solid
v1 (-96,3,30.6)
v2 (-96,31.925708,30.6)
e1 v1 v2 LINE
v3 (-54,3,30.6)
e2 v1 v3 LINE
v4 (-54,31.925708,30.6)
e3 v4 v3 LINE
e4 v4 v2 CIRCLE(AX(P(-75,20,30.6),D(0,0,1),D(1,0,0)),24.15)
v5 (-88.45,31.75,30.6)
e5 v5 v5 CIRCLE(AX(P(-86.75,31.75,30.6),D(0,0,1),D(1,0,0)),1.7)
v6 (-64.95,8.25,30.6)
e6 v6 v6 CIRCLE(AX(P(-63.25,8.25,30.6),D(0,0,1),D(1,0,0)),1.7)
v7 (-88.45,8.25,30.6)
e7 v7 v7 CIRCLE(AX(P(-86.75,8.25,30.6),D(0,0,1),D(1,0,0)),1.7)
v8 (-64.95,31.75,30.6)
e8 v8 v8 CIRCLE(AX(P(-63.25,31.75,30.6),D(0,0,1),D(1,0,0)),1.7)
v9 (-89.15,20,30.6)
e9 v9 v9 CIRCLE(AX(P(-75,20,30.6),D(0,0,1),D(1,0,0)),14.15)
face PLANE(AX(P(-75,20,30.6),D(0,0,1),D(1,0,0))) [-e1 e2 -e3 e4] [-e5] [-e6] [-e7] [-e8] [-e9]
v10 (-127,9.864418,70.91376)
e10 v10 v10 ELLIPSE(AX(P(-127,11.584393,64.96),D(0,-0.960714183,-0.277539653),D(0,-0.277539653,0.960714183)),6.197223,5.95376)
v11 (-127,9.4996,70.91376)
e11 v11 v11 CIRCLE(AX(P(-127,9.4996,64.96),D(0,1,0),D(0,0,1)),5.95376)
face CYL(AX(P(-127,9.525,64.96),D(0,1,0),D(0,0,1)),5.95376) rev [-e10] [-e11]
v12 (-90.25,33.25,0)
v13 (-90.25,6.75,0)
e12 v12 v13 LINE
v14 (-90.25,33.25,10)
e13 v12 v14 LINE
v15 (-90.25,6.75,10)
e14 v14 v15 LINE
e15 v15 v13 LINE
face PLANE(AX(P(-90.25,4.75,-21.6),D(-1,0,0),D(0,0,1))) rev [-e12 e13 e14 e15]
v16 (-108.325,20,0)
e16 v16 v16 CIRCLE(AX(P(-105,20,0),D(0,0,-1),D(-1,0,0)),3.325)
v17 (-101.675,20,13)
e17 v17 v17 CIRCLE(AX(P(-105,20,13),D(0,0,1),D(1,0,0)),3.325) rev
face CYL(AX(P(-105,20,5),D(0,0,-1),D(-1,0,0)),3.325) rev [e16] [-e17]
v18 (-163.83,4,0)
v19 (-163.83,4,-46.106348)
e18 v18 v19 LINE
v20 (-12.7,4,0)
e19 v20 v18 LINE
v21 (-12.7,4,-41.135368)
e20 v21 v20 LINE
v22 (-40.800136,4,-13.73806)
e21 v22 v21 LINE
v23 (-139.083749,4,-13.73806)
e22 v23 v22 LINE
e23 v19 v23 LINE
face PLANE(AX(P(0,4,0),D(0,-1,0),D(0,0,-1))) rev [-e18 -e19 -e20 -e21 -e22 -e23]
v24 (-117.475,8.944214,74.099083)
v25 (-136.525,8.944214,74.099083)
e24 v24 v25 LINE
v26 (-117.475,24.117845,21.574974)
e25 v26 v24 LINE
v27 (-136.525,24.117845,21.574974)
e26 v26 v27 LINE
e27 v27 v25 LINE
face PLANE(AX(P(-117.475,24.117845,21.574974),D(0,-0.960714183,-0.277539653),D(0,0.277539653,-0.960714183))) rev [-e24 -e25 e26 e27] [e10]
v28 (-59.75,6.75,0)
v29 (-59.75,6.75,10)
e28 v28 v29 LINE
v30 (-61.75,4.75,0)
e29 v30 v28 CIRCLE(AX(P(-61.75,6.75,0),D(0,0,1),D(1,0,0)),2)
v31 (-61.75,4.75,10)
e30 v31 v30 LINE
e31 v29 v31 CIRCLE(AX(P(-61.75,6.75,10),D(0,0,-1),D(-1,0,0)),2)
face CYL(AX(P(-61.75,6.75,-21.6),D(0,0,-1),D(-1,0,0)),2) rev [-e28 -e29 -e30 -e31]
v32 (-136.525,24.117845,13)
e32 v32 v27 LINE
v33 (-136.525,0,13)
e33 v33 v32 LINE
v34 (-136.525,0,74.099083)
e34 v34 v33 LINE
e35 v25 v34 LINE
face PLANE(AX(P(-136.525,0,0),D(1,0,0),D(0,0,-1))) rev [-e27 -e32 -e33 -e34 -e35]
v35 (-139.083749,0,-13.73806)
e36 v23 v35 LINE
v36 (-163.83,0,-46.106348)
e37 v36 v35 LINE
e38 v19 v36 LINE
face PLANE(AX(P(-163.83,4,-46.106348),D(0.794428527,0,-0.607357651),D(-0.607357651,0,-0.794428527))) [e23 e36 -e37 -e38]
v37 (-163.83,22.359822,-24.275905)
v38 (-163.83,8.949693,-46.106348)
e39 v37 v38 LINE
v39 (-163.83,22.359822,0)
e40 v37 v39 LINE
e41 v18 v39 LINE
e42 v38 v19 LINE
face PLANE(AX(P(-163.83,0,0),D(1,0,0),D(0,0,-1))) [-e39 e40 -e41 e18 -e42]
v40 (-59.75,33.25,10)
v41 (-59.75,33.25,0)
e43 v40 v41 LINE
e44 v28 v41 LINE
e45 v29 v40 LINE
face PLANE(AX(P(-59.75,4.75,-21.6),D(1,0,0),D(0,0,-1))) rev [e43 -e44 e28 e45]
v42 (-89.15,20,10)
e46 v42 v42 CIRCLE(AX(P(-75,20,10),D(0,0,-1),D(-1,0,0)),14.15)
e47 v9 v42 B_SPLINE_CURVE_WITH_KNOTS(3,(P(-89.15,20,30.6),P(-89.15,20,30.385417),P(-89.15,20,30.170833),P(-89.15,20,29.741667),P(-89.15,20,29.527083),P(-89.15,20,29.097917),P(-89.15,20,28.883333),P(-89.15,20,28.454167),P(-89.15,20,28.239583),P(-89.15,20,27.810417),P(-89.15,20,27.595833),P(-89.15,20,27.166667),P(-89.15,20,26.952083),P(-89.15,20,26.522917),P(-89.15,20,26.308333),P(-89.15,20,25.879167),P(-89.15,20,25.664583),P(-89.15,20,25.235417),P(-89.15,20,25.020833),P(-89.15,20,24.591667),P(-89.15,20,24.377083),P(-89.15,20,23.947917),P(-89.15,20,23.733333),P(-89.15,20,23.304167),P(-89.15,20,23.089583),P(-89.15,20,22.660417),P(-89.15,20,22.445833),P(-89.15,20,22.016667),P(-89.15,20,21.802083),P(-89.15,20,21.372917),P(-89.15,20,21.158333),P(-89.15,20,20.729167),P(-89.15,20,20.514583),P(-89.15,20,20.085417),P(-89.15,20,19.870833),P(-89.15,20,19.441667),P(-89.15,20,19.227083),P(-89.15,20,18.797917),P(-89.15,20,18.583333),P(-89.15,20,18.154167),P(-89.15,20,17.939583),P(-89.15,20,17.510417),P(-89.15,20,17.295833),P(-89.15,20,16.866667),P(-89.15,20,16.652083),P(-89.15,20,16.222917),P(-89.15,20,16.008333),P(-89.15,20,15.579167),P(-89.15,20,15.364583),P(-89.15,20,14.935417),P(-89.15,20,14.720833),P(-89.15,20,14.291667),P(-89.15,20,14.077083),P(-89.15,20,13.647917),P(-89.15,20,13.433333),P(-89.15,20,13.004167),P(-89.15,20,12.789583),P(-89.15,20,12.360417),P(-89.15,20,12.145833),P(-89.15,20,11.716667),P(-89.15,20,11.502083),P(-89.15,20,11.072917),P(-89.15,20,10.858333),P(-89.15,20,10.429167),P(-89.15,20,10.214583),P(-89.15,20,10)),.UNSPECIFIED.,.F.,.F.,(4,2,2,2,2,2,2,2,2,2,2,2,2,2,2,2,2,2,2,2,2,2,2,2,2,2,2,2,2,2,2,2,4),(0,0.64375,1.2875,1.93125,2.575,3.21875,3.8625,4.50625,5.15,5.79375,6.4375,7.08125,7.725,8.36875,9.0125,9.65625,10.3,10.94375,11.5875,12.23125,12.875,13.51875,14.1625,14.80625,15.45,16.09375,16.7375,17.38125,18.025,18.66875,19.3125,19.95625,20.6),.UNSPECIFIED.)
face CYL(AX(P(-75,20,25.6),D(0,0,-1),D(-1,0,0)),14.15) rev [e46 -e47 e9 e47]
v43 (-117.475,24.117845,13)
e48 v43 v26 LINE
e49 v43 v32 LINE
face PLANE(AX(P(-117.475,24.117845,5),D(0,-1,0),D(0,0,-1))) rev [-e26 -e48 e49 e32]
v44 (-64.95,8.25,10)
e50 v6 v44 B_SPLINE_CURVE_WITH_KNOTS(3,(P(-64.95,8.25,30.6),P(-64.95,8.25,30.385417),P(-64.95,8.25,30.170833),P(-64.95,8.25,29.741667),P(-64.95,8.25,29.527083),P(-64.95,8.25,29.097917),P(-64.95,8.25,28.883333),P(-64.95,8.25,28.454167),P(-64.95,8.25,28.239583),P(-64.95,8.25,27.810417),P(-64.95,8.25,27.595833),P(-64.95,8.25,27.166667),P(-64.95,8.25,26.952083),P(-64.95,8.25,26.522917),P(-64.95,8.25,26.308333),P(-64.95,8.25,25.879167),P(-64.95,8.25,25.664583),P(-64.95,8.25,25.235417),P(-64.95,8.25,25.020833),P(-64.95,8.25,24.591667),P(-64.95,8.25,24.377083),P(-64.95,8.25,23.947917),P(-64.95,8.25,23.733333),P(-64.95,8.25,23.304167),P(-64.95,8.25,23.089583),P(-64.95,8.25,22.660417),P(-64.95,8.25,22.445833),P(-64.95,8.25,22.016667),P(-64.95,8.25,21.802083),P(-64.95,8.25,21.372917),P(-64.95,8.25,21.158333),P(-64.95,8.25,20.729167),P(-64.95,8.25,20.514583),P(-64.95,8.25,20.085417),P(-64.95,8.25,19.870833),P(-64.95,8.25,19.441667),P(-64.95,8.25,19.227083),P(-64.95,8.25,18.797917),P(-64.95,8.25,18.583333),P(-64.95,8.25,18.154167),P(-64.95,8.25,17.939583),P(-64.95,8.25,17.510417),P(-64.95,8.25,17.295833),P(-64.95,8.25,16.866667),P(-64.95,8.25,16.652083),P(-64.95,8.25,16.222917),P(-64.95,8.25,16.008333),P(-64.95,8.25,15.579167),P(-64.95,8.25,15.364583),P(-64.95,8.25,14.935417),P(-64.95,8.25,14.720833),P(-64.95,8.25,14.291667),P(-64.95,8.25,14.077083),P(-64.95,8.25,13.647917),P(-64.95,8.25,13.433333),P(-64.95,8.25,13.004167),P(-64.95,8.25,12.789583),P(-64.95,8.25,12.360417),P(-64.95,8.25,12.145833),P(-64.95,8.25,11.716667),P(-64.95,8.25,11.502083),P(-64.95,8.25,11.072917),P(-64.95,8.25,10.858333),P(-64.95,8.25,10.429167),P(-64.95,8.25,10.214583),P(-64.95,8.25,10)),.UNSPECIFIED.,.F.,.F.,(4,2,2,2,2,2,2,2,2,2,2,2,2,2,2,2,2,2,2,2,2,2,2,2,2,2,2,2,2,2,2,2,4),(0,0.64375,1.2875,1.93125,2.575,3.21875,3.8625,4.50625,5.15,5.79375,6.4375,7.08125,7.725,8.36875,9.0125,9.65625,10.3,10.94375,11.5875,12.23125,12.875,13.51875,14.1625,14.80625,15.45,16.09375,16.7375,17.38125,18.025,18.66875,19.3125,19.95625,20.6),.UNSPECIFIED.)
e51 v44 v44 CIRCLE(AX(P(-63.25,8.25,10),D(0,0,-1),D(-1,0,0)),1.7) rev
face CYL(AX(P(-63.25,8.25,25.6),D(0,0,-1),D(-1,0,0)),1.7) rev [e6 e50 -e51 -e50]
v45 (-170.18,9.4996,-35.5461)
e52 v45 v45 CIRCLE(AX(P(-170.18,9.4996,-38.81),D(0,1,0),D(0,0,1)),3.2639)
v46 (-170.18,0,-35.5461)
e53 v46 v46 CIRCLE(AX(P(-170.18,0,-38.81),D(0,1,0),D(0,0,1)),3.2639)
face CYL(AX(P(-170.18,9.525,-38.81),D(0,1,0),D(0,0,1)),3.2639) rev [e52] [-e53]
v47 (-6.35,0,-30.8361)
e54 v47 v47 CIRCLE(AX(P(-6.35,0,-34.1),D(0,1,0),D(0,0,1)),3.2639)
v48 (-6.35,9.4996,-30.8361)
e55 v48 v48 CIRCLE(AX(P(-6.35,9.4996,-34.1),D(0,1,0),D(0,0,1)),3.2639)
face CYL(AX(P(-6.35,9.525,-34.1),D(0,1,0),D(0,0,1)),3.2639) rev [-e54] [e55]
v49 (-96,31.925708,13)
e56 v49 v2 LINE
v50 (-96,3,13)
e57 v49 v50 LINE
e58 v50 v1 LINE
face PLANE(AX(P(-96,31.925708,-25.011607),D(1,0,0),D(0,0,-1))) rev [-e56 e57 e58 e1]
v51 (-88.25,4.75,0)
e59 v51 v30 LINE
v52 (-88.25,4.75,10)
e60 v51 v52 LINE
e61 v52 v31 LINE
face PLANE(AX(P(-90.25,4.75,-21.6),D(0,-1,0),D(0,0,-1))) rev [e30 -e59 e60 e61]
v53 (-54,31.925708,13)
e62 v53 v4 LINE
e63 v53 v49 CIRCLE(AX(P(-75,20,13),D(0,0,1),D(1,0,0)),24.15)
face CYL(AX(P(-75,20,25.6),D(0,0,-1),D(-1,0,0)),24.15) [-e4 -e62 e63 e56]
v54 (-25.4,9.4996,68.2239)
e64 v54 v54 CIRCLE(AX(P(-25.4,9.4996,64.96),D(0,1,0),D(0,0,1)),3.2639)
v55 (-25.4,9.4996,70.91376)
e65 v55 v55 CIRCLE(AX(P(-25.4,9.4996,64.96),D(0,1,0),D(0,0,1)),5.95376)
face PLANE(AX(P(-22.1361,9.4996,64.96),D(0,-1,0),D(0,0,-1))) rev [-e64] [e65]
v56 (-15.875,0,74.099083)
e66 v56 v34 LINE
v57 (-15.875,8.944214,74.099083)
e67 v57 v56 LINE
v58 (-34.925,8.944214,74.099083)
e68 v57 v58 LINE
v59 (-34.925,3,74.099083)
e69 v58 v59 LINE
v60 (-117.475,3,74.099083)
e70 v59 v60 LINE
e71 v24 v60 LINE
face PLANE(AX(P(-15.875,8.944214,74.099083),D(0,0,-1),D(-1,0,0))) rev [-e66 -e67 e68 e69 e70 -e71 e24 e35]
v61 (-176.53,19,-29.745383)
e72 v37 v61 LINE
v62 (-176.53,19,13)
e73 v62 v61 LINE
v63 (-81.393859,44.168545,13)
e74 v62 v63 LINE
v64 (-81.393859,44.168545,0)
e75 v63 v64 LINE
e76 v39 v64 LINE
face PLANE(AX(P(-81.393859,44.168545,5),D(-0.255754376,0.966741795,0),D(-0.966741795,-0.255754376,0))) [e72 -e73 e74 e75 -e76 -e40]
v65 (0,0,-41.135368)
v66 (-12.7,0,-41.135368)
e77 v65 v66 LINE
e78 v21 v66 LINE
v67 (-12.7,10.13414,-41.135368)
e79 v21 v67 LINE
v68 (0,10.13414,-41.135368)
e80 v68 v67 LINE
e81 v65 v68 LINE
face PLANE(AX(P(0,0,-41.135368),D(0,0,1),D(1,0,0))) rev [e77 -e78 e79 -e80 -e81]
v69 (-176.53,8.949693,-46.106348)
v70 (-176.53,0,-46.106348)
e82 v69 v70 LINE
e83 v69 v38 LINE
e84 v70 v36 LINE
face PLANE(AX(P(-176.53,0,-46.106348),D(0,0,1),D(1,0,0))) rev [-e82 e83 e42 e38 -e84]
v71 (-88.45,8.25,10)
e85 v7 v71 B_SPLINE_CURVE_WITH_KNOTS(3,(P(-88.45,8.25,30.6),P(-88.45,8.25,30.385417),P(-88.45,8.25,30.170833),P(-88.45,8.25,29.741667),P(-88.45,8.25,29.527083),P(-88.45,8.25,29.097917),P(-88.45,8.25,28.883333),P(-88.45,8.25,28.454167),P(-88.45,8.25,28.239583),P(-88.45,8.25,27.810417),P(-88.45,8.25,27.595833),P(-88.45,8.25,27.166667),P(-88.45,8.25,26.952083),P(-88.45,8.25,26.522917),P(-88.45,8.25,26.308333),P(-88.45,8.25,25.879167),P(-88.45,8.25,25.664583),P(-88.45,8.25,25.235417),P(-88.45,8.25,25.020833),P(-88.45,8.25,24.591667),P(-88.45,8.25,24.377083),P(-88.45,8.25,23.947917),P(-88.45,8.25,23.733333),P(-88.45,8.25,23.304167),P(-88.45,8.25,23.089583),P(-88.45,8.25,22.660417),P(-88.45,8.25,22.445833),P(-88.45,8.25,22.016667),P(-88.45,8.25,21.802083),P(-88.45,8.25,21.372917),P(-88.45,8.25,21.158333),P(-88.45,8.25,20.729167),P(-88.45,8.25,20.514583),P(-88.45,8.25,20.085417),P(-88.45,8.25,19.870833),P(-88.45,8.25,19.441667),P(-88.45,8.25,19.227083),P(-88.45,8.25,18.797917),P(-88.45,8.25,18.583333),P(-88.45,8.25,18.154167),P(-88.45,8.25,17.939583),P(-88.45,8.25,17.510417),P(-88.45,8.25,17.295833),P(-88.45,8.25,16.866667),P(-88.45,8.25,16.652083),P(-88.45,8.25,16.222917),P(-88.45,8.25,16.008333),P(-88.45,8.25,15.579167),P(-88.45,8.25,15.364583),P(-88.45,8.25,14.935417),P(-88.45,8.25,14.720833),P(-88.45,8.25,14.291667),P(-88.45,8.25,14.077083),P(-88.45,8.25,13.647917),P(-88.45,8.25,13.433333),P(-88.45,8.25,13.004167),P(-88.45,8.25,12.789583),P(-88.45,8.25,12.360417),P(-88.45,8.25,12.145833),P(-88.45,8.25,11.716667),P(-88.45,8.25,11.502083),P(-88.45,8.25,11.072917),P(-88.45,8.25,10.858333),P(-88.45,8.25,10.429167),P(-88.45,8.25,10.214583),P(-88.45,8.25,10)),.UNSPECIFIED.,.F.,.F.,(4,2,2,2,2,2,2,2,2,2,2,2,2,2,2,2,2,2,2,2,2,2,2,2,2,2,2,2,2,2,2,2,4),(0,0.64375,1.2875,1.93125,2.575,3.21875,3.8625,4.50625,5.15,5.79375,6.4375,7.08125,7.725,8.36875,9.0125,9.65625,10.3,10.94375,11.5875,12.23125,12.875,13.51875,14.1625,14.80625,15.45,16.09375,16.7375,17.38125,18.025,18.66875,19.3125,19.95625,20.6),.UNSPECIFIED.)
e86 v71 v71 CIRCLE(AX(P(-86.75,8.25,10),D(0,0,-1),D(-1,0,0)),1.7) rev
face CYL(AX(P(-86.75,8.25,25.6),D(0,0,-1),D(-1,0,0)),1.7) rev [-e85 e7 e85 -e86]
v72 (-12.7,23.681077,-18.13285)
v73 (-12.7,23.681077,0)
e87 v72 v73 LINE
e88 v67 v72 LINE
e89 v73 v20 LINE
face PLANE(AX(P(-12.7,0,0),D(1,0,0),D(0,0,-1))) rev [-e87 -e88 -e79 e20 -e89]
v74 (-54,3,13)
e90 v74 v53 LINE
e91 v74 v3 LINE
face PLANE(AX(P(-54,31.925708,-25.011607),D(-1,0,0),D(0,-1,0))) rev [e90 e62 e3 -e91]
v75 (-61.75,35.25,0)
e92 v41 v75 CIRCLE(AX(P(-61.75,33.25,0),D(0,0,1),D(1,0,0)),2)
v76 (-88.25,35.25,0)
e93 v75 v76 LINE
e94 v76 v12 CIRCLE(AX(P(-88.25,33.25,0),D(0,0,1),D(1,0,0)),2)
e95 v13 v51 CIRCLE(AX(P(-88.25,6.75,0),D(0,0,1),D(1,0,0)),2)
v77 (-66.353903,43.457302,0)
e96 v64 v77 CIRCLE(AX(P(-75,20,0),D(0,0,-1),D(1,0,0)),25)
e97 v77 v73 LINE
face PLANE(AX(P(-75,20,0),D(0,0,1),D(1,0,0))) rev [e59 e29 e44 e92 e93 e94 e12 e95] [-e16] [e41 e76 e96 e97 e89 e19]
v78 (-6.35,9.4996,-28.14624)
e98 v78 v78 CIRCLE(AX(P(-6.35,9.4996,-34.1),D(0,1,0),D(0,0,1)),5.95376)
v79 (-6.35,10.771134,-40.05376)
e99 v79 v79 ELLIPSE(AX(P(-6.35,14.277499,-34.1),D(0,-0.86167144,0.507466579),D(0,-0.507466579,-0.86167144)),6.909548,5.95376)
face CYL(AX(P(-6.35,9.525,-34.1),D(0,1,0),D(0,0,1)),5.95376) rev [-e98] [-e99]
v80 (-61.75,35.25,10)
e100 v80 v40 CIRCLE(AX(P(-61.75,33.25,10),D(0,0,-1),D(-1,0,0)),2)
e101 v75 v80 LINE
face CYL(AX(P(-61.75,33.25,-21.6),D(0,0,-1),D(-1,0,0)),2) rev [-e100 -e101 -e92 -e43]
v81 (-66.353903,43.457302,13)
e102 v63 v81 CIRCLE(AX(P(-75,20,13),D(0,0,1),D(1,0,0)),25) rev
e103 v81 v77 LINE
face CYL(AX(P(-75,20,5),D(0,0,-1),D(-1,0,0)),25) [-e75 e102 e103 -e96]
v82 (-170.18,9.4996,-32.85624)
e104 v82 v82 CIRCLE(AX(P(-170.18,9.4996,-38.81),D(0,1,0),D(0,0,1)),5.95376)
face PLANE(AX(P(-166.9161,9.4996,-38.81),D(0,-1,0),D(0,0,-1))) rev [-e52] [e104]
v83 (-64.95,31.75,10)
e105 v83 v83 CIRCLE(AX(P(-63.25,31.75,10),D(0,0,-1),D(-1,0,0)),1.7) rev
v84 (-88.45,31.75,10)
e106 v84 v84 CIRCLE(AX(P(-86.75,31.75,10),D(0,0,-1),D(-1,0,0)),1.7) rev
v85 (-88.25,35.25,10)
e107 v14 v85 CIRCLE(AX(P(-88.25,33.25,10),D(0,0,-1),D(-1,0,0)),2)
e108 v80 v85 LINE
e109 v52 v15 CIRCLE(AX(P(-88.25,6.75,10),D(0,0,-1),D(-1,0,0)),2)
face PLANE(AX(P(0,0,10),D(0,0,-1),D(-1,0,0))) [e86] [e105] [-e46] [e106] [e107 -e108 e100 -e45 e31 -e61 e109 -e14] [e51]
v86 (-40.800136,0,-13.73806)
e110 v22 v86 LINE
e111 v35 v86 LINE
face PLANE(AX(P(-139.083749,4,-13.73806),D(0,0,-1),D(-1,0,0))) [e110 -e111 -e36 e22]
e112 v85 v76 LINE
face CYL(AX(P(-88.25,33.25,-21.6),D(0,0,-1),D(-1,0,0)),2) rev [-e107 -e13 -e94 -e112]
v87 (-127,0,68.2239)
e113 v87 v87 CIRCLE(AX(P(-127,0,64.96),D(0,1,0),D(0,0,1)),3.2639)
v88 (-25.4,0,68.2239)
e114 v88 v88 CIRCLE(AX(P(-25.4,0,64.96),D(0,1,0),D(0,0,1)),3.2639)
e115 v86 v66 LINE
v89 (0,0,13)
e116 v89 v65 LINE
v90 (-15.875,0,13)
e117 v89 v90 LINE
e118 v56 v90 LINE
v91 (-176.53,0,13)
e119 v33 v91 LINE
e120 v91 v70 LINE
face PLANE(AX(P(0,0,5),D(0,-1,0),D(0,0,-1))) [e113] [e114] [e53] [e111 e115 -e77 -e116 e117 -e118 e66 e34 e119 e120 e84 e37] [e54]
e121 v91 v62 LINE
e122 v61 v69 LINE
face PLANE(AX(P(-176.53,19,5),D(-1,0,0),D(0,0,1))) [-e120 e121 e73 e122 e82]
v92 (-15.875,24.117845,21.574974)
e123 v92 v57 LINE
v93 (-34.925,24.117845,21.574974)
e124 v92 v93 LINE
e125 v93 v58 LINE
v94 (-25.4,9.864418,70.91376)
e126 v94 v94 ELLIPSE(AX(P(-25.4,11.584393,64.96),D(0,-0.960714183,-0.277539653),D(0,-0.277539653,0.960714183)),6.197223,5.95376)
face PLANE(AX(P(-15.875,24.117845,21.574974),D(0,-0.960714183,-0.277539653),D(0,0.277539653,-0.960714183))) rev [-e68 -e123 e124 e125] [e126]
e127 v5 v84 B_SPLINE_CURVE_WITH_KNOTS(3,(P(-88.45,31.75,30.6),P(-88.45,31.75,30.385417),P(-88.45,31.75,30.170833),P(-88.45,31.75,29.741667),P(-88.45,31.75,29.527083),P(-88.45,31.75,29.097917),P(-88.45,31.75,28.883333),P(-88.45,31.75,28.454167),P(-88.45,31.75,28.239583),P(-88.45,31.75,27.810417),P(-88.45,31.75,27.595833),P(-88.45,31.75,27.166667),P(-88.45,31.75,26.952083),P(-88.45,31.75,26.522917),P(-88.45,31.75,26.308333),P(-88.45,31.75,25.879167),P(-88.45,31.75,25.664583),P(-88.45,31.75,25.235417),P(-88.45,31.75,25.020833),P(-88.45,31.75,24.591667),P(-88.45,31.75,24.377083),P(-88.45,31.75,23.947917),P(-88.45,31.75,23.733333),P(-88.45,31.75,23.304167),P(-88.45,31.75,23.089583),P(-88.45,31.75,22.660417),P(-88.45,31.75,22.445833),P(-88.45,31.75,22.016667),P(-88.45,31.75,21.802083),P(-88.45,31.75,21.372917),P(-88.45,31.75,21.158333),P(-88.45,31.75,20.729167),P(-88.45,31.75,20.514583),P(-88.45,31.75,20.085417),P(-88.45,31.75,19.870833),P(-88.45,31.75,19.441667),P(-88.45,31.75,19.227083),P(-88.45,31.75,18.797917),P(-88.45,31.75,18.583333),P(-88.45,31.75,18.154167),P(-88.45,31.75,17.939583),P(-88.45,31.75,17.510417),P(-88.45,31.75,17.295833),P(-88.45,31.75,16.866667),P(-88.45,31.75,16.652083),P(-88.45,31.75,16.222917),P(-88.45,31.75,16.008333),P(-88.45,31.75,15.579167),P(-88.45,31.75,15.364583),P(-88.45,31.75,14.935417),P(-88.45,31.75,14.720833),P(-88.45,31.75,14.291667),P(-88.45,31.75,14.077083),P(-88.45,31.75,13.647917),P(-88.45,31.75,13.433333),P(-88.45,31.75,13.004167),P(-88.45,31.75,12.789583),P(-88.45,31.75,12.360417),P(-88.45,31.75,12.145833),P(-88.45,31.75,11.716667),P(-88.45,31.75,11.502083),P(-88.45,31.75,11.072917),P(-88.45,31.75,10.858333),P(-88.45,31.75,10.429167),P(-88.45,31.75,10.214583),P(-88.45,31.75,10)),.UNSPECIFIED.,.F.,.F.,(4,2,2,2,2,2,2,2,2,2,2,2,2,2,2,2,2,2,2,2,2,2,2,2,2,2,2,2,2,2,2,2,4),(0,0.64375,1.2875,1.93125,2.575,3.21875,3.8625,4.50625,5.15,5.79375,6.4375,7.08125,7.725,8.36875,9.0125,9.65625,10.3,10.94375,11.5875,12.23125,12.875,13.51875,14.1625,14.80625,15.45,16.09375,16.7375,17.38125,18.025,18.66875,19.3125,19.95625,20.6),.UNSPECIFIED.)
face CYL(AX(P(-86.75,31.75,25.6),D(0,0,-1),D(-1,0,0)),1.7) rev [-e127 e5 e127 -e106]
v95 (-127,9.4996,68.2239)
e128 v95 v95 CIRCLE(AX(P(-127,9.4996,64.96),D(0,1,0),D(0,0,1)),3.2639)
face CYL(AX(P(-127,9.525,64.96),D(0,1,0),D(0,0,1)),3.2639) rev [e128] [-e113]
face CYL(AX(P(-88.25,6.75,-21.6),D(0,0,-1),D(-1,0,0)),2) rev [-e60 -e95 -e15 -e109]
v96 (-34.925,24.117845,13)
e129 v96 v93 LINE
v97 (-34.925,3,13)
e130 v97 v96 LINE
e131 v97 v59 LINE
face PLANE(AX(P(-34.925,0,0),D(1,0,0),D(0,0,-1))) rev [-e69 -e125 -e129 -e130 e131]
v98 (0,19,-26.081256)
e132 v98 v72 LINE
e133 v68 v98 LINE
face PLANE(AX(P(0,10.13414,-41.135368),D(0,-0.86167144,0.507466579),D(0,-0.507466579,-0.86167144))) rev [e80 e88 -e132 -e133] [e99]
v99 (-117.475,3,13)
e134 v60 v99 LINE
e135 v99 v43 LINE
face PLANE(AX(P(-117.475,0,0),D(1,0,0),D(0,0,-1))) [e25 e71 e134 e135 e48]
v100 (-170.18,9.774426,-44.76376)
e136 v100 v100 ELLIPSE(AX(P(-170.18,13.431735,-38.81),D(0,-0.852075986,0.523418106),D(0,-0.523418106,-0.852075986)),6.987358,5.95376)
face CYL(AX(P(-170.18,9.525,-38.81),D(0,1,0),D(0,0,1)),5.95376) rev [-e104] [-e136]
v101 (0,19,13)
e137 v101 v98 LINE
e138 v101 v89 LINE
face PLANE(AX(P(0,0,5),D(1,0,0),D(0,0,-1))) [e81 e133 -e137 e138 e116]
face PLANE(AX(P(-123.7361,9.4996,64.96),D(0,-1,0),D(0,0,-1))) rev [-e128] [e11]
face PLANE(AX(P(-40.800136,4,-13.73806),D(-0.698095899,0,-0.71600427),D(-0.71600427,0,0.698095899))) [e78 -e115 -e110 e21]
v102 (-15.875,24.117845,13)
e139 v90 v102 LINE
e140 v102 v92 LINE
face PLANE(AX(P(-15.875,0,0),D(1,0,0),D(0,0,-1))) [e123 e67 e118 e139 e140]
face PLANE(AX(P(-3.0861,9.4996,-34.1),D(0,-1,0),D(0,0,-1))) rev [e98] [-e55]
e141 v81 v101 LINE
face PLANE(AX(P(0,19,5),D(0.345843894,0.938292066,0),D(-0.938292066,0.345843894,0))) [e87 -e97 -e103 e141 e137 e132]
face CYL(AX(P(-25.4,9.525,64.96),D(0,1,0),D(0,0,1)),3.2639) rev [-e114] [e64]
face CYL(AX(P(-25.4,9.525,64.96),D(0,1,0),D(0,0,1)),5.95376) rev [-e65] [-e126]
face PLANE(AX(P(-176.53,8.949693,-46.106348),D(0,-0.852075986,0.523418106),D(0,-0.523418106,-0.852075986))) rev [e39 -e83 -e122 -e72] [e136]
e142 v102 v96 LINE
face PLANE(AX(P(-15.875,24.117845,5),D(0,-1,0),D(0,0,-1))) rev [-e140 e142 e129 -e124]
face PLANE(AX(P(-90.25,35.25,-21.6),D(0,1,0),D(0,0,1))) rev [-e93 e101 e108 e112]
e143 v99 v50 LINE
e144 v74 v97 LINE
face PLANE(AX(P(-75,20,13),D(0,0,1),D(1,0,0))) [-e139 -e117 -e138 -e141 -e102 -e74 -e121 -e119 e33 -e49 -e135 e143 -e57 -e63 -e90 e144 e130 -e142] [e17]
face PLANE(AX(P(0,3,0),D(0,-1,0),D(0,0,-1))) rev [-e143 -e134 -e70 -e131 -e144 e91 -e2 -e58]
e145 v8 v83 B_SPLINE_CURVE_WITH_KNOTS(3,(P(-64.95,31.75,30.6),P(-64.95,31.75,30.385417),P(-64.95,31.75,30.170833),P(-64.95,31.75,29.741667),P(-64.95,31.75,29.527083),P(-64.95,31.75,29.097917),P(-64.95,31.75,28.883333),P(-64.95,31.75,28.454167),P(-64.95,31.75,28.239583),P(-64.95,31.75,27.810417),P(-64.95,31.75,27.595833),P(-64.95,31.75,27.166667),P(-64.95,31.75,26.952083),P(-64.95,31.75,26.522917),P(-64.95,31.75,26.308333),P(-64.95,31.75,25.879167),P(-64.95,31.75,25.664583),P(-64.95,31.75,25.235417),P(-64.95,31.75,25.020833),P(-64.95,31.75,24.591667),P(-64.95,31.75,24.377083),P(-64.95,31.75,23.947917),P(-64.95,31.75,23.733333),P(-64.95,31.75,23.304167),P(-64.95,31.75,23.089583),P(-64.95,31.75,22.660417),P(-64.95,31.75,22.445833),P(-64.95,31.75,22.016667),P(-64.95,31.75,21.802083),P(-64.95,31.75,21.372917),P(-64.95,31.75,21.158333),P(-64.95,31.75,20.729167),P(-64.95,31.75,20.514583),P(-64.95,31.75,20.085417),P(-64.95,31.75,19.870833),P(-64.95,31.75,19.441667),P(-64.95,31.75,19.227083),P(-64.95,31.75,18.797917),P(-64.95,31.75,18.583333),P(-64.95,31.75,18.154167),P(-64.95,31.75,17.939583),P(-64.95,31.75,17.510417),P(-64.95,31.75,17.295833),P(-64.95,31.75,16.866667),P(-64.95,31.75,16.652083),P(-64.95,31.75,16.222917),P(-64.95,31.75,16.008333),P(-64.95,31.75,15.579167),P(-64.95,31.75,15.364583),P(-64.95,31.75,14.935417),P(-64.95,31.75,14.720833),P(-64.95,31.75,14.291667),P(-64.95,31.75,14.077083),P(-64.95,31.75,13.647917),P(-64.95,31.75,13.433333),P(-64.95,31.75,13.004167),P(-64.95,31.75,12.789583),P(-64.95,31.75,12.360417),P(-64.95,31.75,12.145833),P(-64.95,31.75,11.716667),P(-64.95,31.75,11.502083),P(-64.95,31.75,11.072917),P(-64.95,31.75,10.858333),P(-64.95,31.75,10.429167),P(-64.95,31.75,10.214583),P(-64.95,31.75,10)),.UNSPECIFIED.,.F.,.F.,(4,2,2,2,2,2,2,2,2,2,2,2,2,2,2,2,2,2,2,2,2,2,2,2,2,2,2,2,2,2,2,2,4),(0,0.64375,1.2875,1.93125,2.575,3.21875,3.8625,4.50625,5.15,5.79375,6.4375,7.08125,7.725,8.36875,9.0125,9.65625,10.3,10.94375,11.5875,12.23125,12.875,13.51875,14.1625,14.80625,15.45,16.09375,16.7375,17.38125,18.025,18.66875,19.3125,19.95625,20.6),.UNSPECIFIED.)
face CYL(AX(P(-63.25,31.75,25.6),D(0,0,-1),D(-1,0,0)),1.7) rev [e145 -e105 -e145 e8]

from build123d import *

# Parameters (mm, degrees)
SKETCH2_W                                     = 176.53
SKETCH2_H                                     = 28.1
BOSS_EXTRUDE1_DEPTH                           = 5
SKETCH3_R                                     = 6.635934172
SKETCH3_R_2                                   = 3.325
BOSS_EXTRUDE2_DEPTH                           = 5
SKETCH4_R                                     = 6.635934172
SKETCH4_R_2                                   = 3.325
BOSS_EXTRUDE3_DEPTH                           = 5
SKETCH5_R                                     = 3.175
SKETCH5_R_2                                   = 3.890528803
BOSS_EXTRUDE4_DEPTH                           = 5
SKETCH9_R                                     = 24.15
SKETCH9_R_2                                   = 14.15
SKETCH9_R_3                                   = 1.7
BOSS_EXTRUDE5_DEPTH                           = 20.6
SKETCH7_W                                     = 30.5
SKETCH7_H                                     = 30.5
CUT_EXTRUDE2_DEPTH                            = 26.6
BOSS_EXTRUDE6_DEPTH                           = 12.7
BOSS_EXTRUDE7_DEPTH                           = 9.525
BOSS_EXTRUDE8_DEPTH                           = 9.525
SKETCH16_W                                    = 82.55
SKETCH16_H                                    = 69.099082758
BOSS_EXTRUDE9_DEPTH                           = 3
DELETEFACE1_START                             = 5
DELETEFACE1_DEPTH                             = 20.6
BOSS_EXTRUDE10_DEPTH                          = 6.35
BOSS_EXTRUDE11_DEPTH                          = 6.35
CBORE_FOR_1_4_BUTTON_HEAD_CAP_SCREW1_AT_COUNT = 2
CBORE_FOR_1_4_BUTTON_HEAD_CAP_SCREW1_AT_PITCH = 100.875101487
CBORE_FOR_1_4_BUTTON_HEAD_CAP_SCREW1_2_COUNT  = 2
CBORE_FOR_1_4_BUTTON_HEAD_CAP_SCREW1_2_PITCH  = 156.106713821
CBORE_FOR_1_4_BUTTON_HEAD_CAP_SCREW1_3_COUNT  = 2
CBORE_FOR_1_4_BUTTON_HEAD_CAP_SCREW1_3_PITCH  = 163.897690649
SKETCH21_R                                    = 5.95376
CUT_EXTRUDE3_DEPTH                            = 195.710016667
SKETCH23_W                                    = 8
SKETCH23_H                                    = 28.925707526
CUT_EXTRUDE4_DEPTH                            = 20.6
DELETEFACE5_START                             = 5
DELETEFACE5_DEPTH                             = 20.6
BOSS_EXTRUDE12_DEPTH                          = 4
MOVE_FACE3_BY                                 = 5
MOVE_FACE4_BY                                 = 5
FILLET1_R                                     = 2
MOVE_FACE5_BY                                 = 8


# Read off the part's stored shape, not the designer's step: DeleteFace1, DeleteFace5, Split1, Split2
with BuildPart() as part:
    # Sketch2 → Boss-Extrude1 (new body)
    with BuildSketch(Plane(origin=(0, 0, 0), x_dir=(1, 0, 0), z_dir=(0, 1, 0))):
        with Locations((-88.265, 14.05)):
            Rectangle(SKETCH2_W, SKETCH2_H)
    extrude(amount=BOSS_EXTRUDE1_DEPTH)

    # Sketch5 → Boss-Extrude4 (add)
    # profile 1 of 2: a face of its own
    with BuildSketch(Plane(origin=(0, 5, 0), x_dir=(1, 0, 0), z_dir=(0, 1, 0))):
        with BuildLine():
            Line((0, 28.1), (0, 34.1))
            ThreePointArc((0, 34.1), (-2.58351874, 39.212349648), (-8.231848479, 40.164746186))
            Line((-8.231848479, 40.164746186), (-47.113631063, 28.1))
            Line((-47.113631063, 28.1), (0, 28.1))
        make_face()
        with Locations(Location((-6.35, 34.1, 0), (0, 0, 270))):
            Circle(SKETCH5_R, mode=Mode.SUBTRACT)
    # profile 2 of 2: a face of its own
    with BuildSketch(Plane(origin=(0, 5, 0), x_dir=(1, 0, 0), z_dir=(0, 1, 0))):
        with BuildLine():
            Line((0, 0), (0, -42.25))
            ThreePointArc((0, -42.25), (-4.382179377, -48.287398612), (-11.480372282, -45.991895275))
            Line((-11.480372282, -45.991895275), (-45.025083296, 0))
            Line((-45.025083296, 0), (0, 0))
        make_face()
        with Locations(Location((-6.35, -42.25, 0), (0, 0, 270))):
            Circle(SKETCH5_R_2, mode=Mode.SUBTRACT)
    extrude(amount=-BOSS_EXTRUDE4_DEPTH)


with BuildPart() as body_2:
    # Sketch3 → Boss-Extrude2 (new body)
    with BuildSketch(Plane(origin=(0, 0, 0), x_dir=(-1, 0, 0), z_dir=(0, 0, -1))):
        with BuildLine():
            Line((0, 0), (176.53, 0))
            Line((176.53, 0), (176.53, 19))
            Line((176.53, 19), (81.3938594, 44.168544887))
            ThreePointArc((81.3938594, 44.168544887), (73.819063639, 44.972092209), (66.353902645, 43.457301646))
            Line((66.353902645, 43.457301646), (0, 19))
            Line((0, 19), (0, 0))
        make_face()
        with Locations((75, 20)):
            Circle(SKETCH3_R, mode=Mode.SUBTRACT)
        with Locations((105, 20)):
            Circle(SKETCH3_R_2, mode=Mode.SUBTRACT)
    extrude(amount=-BOSS_EXTRUDE2_DEPTH)

    # Sketch9 → Boss-Extrude5 (add)
    with BuildSketch(Plane.XY.offset(5)):
        with Locations(Location((-75, 20, 0), (0, 0, 235.909915964))):
            Circle(SKETCH9_R)
        with Locations(Location((-75, 20, 0), (0, 0, 180))):
            Circle(SKETCH9_R_2, mode=Mode.SUBTRACT)
        with Locations(Location((-86.75, 31.75, 0), (0, 0, 180))):
            Circle(SKETCH9_R_3, mode=Mode.SUBTRACT)
        with Locations(Location((-63.25, 31.75, 0), (0, 0, 180))):
            Circle(SKETCH9_R_3, mode=Mode.SUBTRACT)
        with Locations(Location((-63.25, 8.25, 0), (0, 0, 180))):
            Circle(SKETCH9_R_3, mode=Mode.SUBTRACT)
        with Locations(Location((-86.75, 8.25, 0), (0, 0, 180))):
            Circle(SKETCH9_R_3, mode=Mode.SUBTRACT)
    extrude(amount=BOSS_EXTRUDE5_DEPTH)

    # Sketch7 → Cut-Extrude2 (cut)
    with BuildSketch(Plane.XY.offset(5)):
        with Locations((-75, 20)):
            Rectangle(SKETCH7_W, SKETCH7_H)
    extrude(amount=-CUT_EXTRUDE2_DEPTH, mode=Mode.SUBTRACT)

    # Sketch14 → Boss-Extrude7 (add, symmetric)
    with BuildSketch(Plane(origin=(-25.4, 0, 0), x_dir=(0, 0, -1), z_dir=(1, 0, 0))):
        Polygon((-74.099082758, 0), (-5, 0), (-5, 24.117845296), (-21.574974436, 24.117845296), (-74.099082758, 8.944214003), align=None)
    extrude(amount=BOSS_EXTRUDE7_DEPTH, both=True)

    # Sketch15 → Boss-Extrude8 (add, symmetric)
    with BuildSketch(Plane(origin=(-127, 0, 0), x_dir=(0, 0, -1), z_dir=(1, 0, 0))):
        Polygon((-74.099082758, 8.944214003), (-74.099082758, 0), (-5, 0), (-5, 24.117845296), (-21.574974436, 24.117845296), align=None)
    extrude(amount=BOSS_EXTRUDE8_DEPTH, both=True)

    # Sketch16 → Boss-Extrude9 (add)
    with BuildSketch(Plane.XZ):
        with Locations((-76.2, 39.549541379)):
            Rectangle(SKETCH16_W, SKETCH16_H)
    extrude(amount=-BOSS_EXTRUDE9_DEPTH)

    # DeleteFace1 outline → DeleteFace1 (cut)
    with BuildSketch(Plane.XY.offset(DELETEFACE1_START)):
        with BuildLine():
            ThreePointArc((-88.535970597, 0), (-75, -4.15), (-61.464029403, 0))
            Line((-61.464029403, 0), (-88.535970597, 0))
        make_face()
    extrude(amount=DELETEFACE1_DEPTH, mode=Mode.SUBTRACT)


with BuildPart() as body_3:
    # Sketch4 → Boss-Extrude3 (new body)
    with BuildSketch(Plane.XY.offset(-33.1)):
        with BuildLine():
            Line((-176.53, 19), (-176.53, 0))
            Line((-176.53, 0), (0, 0))
            Line((0, 0), (0, 19))
            Line((0, 19), (-66.353902645, 43.457301646))
            ThreePointArc((-66.353902645, 43.457301646), (-73.819063639, 44.972092209), (-81.3938594, 44.168544887))
            Line((-81.3938594, 44.168544887), (-176.53, 19))
        make_face()
        with Locations(Location((-75, 20, 0), (0, 0, 180))):
            Circle(SKETCH4_R, mode=Mode.SUBTRACT)
        with Locations(Location((-105, 20, 0), (0, 0, 180))):
            Circle(SKETCH4_R_2, mode=Mode.SUBTRACT)
    extrude(amount=BOSS_EXTRUDE3_DEPTH)


with BuildPart() as body_4:
    # Sketch11 → Boss-Extrude6 (new body)
    with BuildSketch(Plane(origin=(0, 0, 0), x_dir=(0, 0, -1), z_dir=(1, 0, 0))):
        Polygon((28.1, 0), (42.275, 0), (42.275, 8), (37.1, 18), (28.1, 18), align=None)
    extrude(amount=-BOSS_EXTRUDE6_DEPTH)


with BuildPart() as body_2_2:
    # Sketch17 → Boss-Extrude10 (new, symmetric)
    with BuildSketch(Plane(origin=(-6.35, 0, 0), x_dir=(0, 0, -1), z_dir=(1, 0, 0))):
        Polygon((0, 0), (41.135367826, 0), (41.135367826, 10.134139823), (10.348575529, 28.265491808), (0, 28.265491808), align=None)
    extrude(amount=BOSS_EXTRUDE10_DEPTH, both=True)

    # Sketch20 → CBORE for 1/4 Button Head Cap Screw1 (revolve, cut)
    with BuildSketch(Plane(origin=(-6.35, 9.525, -34.1), x_dir=(0, 0, 1), z_dir=(1, 0, 0))):
        Polygon((0, 0), (0, 9.525), (3.2639, 9.525), (3.2639, 0.0254), (5.95376, 0.0254), (5.95376, 0), align=None)
    cbore_for_1_4_button_head_cap_screw1 = revolve(axis=Axis((-6.35, 15.875, -34.1), (0, -1, 0)), mode=Mode.SUBTRACT)


with BuildPart() as body_3_2:
    # Sketch18 → Boss-Extrude11 (new, symmetric)
    with BuildSketch(Plane.ZY.offset(170.18)):
        Polygon((-46.106347996, 0), (0, 0), (0, 27.650979473), (-15.662393155, 27.650979473), (-46.106347996, 8.949692928), align=None)
    extrude(amount=BOSS_EXTRUDE11_DEPTH, both=True)

    # CBORE for 1_4 Button Head Cap Screw1 3: CBORE for 1/4 Button Head Cap Screw1 ×2
    with Locations(*[Vector(-0.9995869944933188, 0, -0.028737439687868672) * (i * CBORE_FOR_1_4_BUTTON_HEAD_CAP_SCREW1_3_PITCH) for i in range(1, CBORE_FOR_1_4_BUTTON_HEAD_CAP_SCREW1_3_COUNT)]):
        add(cbore_for_1_4_button_head_cap_screw1, mode=Mode.SUBTRACT)


with BuildPart() as body_2_1:
    add(body_2.part)

    # CBORE for 1/4 Button Head Cap Screw1 at: CBORE for 1/4 Button Head Cap Screw1 ×2
    with Locations(*[Vector(-0.1888473936501245, 0, 0.9820064469806473) * (i * CBORE_FOR_1_4_BUTTON_HEAD_CAP_SCREW1_AT_PITCH) for i in range(1, CBORE_FOR_1_4_BUTTON_HEAD_CAP_SCREW1_AT_COUNT)]):
        add(cbore_for_1_4_button_head_cap_screw1, mode=Mode.SUBTRACT)

    # CBORE for 1_4 Button Head Cap Screw1 2: CBORE for 1/4 Button Head Cap Screw1 ×2
    with Locations(*[Vector(-0.7728687450196582, 0, 0.6345659169635088) * (i * CBORE_FOR_1_4_BUTTON_HEAD_CAP_SCREW1_2_PITCH) for i in range(1, CBORE_FOR_1_4_BUTTON_HEAD_CAP_SCREW1_2_COUNT)]):
        add(cbore_for_1_4_button_head_cap_screw1, mode=Mode.SUBTRACT)


with BuildPart() as cut_extrude3_tool:
    # Sketch21 → Cut-Extrude3 (new, through all)
    with BuildSketch(Plane.XZ.offset(-9.525)):
        with Locations(Location((-6.35, -34.1, 0), (0, 0, 90))):
            Circle(SKETCH21_R)
        with Locations(Location((-25.4, 64.96, 0), (0, 0, 90))):
            Circle(SKETCH21_R)
        with Locations(Location((-127, 64.96, 0), (0, 0, 90))):
            Circle(SKETCH21_R)
        with Locations(Location((-170.18, -38.81, 0), (0, 0, 90))):
            Circle(SKETCH21_R)
    extrude(amount=-CUT_EXTRUDE3_DEPTH)


with BuildPart() as body_2_3:
    add(body_2_1.part)

    # Cut-Extrude3: cut by cut_extrude3_tool
    add(cut_extrude3_tool.part, mode=Mode.SUBTRACT)

    # Sketch23 → Cut-Extrude4 (cut)
    with BuildSketch(Plane.XY.offset(25.6)):
        with Locations((-100, 17.462853763)):
            Rectangle(SKETCH23_W, SKETCH23_H)
        with Locations((-50, 17.462853763)):
            Rectangle(SKETCH23_W, SKETCH23_H)
    extrude(amount=-CUT_EXTRUDE4_DEPTH, mode=Mode.SUBTRACT)

    # DeleteFace5 outline → DeleteFace5 (add)
    with BuildSketch(Plane.XY.offset(DELETEFACE5_START)):
        with BuildLine():
            Line((-96, 3), (-92.152915204, 3))
            ThreePointArc((-92.152915204, 3), (-94.244436746, 5.409792519), (-96, 8.074292474))
            Line((-96, 8.074292474), (-96, 3))
        make_face()
        with BuildLine():
            ThreePointArc((-54, 8.074292474), (-55.755563254, 5.409792519), (-57.847084796, 3))
            Line((-57.847084796, 3), (-54, 3))
            Line((-54, 3), (-54, 8.074292474))
        make_face()
    extrude(amount=DELETEFACE5_DEPTH)



with BuildPart() as body_2_2_1:
    add(body_2_2.part)

    # Cut-Extrude3: cut by cut_extrude3_tool
    add(cut_extrude3_tool.part, mode=Mode.SUBTRACT)


with BuildPart() as body_3_2_1:
    add(body_3_2.part)

    # Cut-Extrude3: cut by cut_extrude3_tool
    add(cut_extrude3_tool.part, mode=Mode.SUBTRACT)


with BuildPart() as body_4_2:
    # Split1: the piece on the far side of the plane
    add(body_2_2_1.part)
    split(bisect_by=Plane(origin=(6.165549057, 16.727448016, 0), x_dir=(0.9382920658498299, -0.345843894211331, 0), z_dir=(0.345843894211331, 0.93829206584983, 0)), keep=Keep.BOTTOM)


with BuildPart() as body_2_2_2:
    add(body_2_2_1.part)

    # Split1
    split(bisect_by=Plane(origin=(6.165549057, 16.727448016, 0), x_dir=(0.9382920658498299, -0.345843894211331, 0), z_dir=(0.345843894211331, 0.93829206584983, 0)), keep=Keep.TOP)


with BuildPart() as body_4_3:
    # Split2: the piece on the far side of the plane
    add(body_3_2_1.part)
    split(bisect_by=Plane(origin=(-16.244600857, 61.40397222, 0), x_dir=(0.9667417954944176, 0.2557543760021119, 0), z_dir=(0.2557543760021119, -0.9667417954944177, 0)), keep=Keep.BOTTOM)


with BuildPart() as body_3_2_2:
    add(body_3_2_1.part)

    # Split2
    split(bisect_by=Plane(origin=(-16.244600857, 61.40397222, 0), x_dir=(0.9667417954944176, 0.2557543760021119, 0), z_dir=(0.2557543760021119, -0.9667417954944177, 0)), keep=Keep.TOP)


with BuildPart() as body_2_4:
    add(body_2_3.part)

    add(body_3_2_2.part)  # Boss-Extrude12 merges body 3 2

    add(body_4_2.part)  # Boss-Extrude12 merges body 4 2
    # Sketch24 → Boss-Extrude12 (add)
    with BuildSketch(Plane.XZ):
        Polygon((-163.83, -46.106347996), (-139.083749424, -13.738059948), (-40.800135607, -13.738059948), (-12.7, -41.135367826), (-12.7, 0), (-163.83, 0), align=None)
    extrude(amount=-BOSS_EXTRUDE12_DEPTH)

    # Move Face3: a face moved outward by 5.0
    extrude(body_2_4.faces().sort_by_distance((-75, 40.035, 25.6))[0], amount=MOVE_FACE3_BY, dir=(0, 0, 1))

    # Move Face4: a face moved inward by 5.0
    extrude(body_2_4.faces().sort_by_distance((-82.625, 7.8, 5))[0], amount=MOVE_FACE4_BY, dir=(0, 0, 1), mode=Mode.SUBTRACT)

    # Fillet1
    fillet1_edges = [body_2_4.edges().sort_by_distance(p)[0] for p in [
        (-59.75, 35.25, 2.5),
        (-59.75, 4.75, 2.5),
        (-90.25, 4.75, 2.5),
        (-90.25, 35.25, 2.5),
    ]]
    fillet(fillet1_edges, radius=FILLET1_R)

    # Move Face5: a face moved outward by 8.0
    extrude(body_2_4.faces().sort_by_distance((-88.265, 40.5, 5))[0], amount=MOVE_FACE5_BY, dir=(0, 0, 1))


solid = body_2_4.part
